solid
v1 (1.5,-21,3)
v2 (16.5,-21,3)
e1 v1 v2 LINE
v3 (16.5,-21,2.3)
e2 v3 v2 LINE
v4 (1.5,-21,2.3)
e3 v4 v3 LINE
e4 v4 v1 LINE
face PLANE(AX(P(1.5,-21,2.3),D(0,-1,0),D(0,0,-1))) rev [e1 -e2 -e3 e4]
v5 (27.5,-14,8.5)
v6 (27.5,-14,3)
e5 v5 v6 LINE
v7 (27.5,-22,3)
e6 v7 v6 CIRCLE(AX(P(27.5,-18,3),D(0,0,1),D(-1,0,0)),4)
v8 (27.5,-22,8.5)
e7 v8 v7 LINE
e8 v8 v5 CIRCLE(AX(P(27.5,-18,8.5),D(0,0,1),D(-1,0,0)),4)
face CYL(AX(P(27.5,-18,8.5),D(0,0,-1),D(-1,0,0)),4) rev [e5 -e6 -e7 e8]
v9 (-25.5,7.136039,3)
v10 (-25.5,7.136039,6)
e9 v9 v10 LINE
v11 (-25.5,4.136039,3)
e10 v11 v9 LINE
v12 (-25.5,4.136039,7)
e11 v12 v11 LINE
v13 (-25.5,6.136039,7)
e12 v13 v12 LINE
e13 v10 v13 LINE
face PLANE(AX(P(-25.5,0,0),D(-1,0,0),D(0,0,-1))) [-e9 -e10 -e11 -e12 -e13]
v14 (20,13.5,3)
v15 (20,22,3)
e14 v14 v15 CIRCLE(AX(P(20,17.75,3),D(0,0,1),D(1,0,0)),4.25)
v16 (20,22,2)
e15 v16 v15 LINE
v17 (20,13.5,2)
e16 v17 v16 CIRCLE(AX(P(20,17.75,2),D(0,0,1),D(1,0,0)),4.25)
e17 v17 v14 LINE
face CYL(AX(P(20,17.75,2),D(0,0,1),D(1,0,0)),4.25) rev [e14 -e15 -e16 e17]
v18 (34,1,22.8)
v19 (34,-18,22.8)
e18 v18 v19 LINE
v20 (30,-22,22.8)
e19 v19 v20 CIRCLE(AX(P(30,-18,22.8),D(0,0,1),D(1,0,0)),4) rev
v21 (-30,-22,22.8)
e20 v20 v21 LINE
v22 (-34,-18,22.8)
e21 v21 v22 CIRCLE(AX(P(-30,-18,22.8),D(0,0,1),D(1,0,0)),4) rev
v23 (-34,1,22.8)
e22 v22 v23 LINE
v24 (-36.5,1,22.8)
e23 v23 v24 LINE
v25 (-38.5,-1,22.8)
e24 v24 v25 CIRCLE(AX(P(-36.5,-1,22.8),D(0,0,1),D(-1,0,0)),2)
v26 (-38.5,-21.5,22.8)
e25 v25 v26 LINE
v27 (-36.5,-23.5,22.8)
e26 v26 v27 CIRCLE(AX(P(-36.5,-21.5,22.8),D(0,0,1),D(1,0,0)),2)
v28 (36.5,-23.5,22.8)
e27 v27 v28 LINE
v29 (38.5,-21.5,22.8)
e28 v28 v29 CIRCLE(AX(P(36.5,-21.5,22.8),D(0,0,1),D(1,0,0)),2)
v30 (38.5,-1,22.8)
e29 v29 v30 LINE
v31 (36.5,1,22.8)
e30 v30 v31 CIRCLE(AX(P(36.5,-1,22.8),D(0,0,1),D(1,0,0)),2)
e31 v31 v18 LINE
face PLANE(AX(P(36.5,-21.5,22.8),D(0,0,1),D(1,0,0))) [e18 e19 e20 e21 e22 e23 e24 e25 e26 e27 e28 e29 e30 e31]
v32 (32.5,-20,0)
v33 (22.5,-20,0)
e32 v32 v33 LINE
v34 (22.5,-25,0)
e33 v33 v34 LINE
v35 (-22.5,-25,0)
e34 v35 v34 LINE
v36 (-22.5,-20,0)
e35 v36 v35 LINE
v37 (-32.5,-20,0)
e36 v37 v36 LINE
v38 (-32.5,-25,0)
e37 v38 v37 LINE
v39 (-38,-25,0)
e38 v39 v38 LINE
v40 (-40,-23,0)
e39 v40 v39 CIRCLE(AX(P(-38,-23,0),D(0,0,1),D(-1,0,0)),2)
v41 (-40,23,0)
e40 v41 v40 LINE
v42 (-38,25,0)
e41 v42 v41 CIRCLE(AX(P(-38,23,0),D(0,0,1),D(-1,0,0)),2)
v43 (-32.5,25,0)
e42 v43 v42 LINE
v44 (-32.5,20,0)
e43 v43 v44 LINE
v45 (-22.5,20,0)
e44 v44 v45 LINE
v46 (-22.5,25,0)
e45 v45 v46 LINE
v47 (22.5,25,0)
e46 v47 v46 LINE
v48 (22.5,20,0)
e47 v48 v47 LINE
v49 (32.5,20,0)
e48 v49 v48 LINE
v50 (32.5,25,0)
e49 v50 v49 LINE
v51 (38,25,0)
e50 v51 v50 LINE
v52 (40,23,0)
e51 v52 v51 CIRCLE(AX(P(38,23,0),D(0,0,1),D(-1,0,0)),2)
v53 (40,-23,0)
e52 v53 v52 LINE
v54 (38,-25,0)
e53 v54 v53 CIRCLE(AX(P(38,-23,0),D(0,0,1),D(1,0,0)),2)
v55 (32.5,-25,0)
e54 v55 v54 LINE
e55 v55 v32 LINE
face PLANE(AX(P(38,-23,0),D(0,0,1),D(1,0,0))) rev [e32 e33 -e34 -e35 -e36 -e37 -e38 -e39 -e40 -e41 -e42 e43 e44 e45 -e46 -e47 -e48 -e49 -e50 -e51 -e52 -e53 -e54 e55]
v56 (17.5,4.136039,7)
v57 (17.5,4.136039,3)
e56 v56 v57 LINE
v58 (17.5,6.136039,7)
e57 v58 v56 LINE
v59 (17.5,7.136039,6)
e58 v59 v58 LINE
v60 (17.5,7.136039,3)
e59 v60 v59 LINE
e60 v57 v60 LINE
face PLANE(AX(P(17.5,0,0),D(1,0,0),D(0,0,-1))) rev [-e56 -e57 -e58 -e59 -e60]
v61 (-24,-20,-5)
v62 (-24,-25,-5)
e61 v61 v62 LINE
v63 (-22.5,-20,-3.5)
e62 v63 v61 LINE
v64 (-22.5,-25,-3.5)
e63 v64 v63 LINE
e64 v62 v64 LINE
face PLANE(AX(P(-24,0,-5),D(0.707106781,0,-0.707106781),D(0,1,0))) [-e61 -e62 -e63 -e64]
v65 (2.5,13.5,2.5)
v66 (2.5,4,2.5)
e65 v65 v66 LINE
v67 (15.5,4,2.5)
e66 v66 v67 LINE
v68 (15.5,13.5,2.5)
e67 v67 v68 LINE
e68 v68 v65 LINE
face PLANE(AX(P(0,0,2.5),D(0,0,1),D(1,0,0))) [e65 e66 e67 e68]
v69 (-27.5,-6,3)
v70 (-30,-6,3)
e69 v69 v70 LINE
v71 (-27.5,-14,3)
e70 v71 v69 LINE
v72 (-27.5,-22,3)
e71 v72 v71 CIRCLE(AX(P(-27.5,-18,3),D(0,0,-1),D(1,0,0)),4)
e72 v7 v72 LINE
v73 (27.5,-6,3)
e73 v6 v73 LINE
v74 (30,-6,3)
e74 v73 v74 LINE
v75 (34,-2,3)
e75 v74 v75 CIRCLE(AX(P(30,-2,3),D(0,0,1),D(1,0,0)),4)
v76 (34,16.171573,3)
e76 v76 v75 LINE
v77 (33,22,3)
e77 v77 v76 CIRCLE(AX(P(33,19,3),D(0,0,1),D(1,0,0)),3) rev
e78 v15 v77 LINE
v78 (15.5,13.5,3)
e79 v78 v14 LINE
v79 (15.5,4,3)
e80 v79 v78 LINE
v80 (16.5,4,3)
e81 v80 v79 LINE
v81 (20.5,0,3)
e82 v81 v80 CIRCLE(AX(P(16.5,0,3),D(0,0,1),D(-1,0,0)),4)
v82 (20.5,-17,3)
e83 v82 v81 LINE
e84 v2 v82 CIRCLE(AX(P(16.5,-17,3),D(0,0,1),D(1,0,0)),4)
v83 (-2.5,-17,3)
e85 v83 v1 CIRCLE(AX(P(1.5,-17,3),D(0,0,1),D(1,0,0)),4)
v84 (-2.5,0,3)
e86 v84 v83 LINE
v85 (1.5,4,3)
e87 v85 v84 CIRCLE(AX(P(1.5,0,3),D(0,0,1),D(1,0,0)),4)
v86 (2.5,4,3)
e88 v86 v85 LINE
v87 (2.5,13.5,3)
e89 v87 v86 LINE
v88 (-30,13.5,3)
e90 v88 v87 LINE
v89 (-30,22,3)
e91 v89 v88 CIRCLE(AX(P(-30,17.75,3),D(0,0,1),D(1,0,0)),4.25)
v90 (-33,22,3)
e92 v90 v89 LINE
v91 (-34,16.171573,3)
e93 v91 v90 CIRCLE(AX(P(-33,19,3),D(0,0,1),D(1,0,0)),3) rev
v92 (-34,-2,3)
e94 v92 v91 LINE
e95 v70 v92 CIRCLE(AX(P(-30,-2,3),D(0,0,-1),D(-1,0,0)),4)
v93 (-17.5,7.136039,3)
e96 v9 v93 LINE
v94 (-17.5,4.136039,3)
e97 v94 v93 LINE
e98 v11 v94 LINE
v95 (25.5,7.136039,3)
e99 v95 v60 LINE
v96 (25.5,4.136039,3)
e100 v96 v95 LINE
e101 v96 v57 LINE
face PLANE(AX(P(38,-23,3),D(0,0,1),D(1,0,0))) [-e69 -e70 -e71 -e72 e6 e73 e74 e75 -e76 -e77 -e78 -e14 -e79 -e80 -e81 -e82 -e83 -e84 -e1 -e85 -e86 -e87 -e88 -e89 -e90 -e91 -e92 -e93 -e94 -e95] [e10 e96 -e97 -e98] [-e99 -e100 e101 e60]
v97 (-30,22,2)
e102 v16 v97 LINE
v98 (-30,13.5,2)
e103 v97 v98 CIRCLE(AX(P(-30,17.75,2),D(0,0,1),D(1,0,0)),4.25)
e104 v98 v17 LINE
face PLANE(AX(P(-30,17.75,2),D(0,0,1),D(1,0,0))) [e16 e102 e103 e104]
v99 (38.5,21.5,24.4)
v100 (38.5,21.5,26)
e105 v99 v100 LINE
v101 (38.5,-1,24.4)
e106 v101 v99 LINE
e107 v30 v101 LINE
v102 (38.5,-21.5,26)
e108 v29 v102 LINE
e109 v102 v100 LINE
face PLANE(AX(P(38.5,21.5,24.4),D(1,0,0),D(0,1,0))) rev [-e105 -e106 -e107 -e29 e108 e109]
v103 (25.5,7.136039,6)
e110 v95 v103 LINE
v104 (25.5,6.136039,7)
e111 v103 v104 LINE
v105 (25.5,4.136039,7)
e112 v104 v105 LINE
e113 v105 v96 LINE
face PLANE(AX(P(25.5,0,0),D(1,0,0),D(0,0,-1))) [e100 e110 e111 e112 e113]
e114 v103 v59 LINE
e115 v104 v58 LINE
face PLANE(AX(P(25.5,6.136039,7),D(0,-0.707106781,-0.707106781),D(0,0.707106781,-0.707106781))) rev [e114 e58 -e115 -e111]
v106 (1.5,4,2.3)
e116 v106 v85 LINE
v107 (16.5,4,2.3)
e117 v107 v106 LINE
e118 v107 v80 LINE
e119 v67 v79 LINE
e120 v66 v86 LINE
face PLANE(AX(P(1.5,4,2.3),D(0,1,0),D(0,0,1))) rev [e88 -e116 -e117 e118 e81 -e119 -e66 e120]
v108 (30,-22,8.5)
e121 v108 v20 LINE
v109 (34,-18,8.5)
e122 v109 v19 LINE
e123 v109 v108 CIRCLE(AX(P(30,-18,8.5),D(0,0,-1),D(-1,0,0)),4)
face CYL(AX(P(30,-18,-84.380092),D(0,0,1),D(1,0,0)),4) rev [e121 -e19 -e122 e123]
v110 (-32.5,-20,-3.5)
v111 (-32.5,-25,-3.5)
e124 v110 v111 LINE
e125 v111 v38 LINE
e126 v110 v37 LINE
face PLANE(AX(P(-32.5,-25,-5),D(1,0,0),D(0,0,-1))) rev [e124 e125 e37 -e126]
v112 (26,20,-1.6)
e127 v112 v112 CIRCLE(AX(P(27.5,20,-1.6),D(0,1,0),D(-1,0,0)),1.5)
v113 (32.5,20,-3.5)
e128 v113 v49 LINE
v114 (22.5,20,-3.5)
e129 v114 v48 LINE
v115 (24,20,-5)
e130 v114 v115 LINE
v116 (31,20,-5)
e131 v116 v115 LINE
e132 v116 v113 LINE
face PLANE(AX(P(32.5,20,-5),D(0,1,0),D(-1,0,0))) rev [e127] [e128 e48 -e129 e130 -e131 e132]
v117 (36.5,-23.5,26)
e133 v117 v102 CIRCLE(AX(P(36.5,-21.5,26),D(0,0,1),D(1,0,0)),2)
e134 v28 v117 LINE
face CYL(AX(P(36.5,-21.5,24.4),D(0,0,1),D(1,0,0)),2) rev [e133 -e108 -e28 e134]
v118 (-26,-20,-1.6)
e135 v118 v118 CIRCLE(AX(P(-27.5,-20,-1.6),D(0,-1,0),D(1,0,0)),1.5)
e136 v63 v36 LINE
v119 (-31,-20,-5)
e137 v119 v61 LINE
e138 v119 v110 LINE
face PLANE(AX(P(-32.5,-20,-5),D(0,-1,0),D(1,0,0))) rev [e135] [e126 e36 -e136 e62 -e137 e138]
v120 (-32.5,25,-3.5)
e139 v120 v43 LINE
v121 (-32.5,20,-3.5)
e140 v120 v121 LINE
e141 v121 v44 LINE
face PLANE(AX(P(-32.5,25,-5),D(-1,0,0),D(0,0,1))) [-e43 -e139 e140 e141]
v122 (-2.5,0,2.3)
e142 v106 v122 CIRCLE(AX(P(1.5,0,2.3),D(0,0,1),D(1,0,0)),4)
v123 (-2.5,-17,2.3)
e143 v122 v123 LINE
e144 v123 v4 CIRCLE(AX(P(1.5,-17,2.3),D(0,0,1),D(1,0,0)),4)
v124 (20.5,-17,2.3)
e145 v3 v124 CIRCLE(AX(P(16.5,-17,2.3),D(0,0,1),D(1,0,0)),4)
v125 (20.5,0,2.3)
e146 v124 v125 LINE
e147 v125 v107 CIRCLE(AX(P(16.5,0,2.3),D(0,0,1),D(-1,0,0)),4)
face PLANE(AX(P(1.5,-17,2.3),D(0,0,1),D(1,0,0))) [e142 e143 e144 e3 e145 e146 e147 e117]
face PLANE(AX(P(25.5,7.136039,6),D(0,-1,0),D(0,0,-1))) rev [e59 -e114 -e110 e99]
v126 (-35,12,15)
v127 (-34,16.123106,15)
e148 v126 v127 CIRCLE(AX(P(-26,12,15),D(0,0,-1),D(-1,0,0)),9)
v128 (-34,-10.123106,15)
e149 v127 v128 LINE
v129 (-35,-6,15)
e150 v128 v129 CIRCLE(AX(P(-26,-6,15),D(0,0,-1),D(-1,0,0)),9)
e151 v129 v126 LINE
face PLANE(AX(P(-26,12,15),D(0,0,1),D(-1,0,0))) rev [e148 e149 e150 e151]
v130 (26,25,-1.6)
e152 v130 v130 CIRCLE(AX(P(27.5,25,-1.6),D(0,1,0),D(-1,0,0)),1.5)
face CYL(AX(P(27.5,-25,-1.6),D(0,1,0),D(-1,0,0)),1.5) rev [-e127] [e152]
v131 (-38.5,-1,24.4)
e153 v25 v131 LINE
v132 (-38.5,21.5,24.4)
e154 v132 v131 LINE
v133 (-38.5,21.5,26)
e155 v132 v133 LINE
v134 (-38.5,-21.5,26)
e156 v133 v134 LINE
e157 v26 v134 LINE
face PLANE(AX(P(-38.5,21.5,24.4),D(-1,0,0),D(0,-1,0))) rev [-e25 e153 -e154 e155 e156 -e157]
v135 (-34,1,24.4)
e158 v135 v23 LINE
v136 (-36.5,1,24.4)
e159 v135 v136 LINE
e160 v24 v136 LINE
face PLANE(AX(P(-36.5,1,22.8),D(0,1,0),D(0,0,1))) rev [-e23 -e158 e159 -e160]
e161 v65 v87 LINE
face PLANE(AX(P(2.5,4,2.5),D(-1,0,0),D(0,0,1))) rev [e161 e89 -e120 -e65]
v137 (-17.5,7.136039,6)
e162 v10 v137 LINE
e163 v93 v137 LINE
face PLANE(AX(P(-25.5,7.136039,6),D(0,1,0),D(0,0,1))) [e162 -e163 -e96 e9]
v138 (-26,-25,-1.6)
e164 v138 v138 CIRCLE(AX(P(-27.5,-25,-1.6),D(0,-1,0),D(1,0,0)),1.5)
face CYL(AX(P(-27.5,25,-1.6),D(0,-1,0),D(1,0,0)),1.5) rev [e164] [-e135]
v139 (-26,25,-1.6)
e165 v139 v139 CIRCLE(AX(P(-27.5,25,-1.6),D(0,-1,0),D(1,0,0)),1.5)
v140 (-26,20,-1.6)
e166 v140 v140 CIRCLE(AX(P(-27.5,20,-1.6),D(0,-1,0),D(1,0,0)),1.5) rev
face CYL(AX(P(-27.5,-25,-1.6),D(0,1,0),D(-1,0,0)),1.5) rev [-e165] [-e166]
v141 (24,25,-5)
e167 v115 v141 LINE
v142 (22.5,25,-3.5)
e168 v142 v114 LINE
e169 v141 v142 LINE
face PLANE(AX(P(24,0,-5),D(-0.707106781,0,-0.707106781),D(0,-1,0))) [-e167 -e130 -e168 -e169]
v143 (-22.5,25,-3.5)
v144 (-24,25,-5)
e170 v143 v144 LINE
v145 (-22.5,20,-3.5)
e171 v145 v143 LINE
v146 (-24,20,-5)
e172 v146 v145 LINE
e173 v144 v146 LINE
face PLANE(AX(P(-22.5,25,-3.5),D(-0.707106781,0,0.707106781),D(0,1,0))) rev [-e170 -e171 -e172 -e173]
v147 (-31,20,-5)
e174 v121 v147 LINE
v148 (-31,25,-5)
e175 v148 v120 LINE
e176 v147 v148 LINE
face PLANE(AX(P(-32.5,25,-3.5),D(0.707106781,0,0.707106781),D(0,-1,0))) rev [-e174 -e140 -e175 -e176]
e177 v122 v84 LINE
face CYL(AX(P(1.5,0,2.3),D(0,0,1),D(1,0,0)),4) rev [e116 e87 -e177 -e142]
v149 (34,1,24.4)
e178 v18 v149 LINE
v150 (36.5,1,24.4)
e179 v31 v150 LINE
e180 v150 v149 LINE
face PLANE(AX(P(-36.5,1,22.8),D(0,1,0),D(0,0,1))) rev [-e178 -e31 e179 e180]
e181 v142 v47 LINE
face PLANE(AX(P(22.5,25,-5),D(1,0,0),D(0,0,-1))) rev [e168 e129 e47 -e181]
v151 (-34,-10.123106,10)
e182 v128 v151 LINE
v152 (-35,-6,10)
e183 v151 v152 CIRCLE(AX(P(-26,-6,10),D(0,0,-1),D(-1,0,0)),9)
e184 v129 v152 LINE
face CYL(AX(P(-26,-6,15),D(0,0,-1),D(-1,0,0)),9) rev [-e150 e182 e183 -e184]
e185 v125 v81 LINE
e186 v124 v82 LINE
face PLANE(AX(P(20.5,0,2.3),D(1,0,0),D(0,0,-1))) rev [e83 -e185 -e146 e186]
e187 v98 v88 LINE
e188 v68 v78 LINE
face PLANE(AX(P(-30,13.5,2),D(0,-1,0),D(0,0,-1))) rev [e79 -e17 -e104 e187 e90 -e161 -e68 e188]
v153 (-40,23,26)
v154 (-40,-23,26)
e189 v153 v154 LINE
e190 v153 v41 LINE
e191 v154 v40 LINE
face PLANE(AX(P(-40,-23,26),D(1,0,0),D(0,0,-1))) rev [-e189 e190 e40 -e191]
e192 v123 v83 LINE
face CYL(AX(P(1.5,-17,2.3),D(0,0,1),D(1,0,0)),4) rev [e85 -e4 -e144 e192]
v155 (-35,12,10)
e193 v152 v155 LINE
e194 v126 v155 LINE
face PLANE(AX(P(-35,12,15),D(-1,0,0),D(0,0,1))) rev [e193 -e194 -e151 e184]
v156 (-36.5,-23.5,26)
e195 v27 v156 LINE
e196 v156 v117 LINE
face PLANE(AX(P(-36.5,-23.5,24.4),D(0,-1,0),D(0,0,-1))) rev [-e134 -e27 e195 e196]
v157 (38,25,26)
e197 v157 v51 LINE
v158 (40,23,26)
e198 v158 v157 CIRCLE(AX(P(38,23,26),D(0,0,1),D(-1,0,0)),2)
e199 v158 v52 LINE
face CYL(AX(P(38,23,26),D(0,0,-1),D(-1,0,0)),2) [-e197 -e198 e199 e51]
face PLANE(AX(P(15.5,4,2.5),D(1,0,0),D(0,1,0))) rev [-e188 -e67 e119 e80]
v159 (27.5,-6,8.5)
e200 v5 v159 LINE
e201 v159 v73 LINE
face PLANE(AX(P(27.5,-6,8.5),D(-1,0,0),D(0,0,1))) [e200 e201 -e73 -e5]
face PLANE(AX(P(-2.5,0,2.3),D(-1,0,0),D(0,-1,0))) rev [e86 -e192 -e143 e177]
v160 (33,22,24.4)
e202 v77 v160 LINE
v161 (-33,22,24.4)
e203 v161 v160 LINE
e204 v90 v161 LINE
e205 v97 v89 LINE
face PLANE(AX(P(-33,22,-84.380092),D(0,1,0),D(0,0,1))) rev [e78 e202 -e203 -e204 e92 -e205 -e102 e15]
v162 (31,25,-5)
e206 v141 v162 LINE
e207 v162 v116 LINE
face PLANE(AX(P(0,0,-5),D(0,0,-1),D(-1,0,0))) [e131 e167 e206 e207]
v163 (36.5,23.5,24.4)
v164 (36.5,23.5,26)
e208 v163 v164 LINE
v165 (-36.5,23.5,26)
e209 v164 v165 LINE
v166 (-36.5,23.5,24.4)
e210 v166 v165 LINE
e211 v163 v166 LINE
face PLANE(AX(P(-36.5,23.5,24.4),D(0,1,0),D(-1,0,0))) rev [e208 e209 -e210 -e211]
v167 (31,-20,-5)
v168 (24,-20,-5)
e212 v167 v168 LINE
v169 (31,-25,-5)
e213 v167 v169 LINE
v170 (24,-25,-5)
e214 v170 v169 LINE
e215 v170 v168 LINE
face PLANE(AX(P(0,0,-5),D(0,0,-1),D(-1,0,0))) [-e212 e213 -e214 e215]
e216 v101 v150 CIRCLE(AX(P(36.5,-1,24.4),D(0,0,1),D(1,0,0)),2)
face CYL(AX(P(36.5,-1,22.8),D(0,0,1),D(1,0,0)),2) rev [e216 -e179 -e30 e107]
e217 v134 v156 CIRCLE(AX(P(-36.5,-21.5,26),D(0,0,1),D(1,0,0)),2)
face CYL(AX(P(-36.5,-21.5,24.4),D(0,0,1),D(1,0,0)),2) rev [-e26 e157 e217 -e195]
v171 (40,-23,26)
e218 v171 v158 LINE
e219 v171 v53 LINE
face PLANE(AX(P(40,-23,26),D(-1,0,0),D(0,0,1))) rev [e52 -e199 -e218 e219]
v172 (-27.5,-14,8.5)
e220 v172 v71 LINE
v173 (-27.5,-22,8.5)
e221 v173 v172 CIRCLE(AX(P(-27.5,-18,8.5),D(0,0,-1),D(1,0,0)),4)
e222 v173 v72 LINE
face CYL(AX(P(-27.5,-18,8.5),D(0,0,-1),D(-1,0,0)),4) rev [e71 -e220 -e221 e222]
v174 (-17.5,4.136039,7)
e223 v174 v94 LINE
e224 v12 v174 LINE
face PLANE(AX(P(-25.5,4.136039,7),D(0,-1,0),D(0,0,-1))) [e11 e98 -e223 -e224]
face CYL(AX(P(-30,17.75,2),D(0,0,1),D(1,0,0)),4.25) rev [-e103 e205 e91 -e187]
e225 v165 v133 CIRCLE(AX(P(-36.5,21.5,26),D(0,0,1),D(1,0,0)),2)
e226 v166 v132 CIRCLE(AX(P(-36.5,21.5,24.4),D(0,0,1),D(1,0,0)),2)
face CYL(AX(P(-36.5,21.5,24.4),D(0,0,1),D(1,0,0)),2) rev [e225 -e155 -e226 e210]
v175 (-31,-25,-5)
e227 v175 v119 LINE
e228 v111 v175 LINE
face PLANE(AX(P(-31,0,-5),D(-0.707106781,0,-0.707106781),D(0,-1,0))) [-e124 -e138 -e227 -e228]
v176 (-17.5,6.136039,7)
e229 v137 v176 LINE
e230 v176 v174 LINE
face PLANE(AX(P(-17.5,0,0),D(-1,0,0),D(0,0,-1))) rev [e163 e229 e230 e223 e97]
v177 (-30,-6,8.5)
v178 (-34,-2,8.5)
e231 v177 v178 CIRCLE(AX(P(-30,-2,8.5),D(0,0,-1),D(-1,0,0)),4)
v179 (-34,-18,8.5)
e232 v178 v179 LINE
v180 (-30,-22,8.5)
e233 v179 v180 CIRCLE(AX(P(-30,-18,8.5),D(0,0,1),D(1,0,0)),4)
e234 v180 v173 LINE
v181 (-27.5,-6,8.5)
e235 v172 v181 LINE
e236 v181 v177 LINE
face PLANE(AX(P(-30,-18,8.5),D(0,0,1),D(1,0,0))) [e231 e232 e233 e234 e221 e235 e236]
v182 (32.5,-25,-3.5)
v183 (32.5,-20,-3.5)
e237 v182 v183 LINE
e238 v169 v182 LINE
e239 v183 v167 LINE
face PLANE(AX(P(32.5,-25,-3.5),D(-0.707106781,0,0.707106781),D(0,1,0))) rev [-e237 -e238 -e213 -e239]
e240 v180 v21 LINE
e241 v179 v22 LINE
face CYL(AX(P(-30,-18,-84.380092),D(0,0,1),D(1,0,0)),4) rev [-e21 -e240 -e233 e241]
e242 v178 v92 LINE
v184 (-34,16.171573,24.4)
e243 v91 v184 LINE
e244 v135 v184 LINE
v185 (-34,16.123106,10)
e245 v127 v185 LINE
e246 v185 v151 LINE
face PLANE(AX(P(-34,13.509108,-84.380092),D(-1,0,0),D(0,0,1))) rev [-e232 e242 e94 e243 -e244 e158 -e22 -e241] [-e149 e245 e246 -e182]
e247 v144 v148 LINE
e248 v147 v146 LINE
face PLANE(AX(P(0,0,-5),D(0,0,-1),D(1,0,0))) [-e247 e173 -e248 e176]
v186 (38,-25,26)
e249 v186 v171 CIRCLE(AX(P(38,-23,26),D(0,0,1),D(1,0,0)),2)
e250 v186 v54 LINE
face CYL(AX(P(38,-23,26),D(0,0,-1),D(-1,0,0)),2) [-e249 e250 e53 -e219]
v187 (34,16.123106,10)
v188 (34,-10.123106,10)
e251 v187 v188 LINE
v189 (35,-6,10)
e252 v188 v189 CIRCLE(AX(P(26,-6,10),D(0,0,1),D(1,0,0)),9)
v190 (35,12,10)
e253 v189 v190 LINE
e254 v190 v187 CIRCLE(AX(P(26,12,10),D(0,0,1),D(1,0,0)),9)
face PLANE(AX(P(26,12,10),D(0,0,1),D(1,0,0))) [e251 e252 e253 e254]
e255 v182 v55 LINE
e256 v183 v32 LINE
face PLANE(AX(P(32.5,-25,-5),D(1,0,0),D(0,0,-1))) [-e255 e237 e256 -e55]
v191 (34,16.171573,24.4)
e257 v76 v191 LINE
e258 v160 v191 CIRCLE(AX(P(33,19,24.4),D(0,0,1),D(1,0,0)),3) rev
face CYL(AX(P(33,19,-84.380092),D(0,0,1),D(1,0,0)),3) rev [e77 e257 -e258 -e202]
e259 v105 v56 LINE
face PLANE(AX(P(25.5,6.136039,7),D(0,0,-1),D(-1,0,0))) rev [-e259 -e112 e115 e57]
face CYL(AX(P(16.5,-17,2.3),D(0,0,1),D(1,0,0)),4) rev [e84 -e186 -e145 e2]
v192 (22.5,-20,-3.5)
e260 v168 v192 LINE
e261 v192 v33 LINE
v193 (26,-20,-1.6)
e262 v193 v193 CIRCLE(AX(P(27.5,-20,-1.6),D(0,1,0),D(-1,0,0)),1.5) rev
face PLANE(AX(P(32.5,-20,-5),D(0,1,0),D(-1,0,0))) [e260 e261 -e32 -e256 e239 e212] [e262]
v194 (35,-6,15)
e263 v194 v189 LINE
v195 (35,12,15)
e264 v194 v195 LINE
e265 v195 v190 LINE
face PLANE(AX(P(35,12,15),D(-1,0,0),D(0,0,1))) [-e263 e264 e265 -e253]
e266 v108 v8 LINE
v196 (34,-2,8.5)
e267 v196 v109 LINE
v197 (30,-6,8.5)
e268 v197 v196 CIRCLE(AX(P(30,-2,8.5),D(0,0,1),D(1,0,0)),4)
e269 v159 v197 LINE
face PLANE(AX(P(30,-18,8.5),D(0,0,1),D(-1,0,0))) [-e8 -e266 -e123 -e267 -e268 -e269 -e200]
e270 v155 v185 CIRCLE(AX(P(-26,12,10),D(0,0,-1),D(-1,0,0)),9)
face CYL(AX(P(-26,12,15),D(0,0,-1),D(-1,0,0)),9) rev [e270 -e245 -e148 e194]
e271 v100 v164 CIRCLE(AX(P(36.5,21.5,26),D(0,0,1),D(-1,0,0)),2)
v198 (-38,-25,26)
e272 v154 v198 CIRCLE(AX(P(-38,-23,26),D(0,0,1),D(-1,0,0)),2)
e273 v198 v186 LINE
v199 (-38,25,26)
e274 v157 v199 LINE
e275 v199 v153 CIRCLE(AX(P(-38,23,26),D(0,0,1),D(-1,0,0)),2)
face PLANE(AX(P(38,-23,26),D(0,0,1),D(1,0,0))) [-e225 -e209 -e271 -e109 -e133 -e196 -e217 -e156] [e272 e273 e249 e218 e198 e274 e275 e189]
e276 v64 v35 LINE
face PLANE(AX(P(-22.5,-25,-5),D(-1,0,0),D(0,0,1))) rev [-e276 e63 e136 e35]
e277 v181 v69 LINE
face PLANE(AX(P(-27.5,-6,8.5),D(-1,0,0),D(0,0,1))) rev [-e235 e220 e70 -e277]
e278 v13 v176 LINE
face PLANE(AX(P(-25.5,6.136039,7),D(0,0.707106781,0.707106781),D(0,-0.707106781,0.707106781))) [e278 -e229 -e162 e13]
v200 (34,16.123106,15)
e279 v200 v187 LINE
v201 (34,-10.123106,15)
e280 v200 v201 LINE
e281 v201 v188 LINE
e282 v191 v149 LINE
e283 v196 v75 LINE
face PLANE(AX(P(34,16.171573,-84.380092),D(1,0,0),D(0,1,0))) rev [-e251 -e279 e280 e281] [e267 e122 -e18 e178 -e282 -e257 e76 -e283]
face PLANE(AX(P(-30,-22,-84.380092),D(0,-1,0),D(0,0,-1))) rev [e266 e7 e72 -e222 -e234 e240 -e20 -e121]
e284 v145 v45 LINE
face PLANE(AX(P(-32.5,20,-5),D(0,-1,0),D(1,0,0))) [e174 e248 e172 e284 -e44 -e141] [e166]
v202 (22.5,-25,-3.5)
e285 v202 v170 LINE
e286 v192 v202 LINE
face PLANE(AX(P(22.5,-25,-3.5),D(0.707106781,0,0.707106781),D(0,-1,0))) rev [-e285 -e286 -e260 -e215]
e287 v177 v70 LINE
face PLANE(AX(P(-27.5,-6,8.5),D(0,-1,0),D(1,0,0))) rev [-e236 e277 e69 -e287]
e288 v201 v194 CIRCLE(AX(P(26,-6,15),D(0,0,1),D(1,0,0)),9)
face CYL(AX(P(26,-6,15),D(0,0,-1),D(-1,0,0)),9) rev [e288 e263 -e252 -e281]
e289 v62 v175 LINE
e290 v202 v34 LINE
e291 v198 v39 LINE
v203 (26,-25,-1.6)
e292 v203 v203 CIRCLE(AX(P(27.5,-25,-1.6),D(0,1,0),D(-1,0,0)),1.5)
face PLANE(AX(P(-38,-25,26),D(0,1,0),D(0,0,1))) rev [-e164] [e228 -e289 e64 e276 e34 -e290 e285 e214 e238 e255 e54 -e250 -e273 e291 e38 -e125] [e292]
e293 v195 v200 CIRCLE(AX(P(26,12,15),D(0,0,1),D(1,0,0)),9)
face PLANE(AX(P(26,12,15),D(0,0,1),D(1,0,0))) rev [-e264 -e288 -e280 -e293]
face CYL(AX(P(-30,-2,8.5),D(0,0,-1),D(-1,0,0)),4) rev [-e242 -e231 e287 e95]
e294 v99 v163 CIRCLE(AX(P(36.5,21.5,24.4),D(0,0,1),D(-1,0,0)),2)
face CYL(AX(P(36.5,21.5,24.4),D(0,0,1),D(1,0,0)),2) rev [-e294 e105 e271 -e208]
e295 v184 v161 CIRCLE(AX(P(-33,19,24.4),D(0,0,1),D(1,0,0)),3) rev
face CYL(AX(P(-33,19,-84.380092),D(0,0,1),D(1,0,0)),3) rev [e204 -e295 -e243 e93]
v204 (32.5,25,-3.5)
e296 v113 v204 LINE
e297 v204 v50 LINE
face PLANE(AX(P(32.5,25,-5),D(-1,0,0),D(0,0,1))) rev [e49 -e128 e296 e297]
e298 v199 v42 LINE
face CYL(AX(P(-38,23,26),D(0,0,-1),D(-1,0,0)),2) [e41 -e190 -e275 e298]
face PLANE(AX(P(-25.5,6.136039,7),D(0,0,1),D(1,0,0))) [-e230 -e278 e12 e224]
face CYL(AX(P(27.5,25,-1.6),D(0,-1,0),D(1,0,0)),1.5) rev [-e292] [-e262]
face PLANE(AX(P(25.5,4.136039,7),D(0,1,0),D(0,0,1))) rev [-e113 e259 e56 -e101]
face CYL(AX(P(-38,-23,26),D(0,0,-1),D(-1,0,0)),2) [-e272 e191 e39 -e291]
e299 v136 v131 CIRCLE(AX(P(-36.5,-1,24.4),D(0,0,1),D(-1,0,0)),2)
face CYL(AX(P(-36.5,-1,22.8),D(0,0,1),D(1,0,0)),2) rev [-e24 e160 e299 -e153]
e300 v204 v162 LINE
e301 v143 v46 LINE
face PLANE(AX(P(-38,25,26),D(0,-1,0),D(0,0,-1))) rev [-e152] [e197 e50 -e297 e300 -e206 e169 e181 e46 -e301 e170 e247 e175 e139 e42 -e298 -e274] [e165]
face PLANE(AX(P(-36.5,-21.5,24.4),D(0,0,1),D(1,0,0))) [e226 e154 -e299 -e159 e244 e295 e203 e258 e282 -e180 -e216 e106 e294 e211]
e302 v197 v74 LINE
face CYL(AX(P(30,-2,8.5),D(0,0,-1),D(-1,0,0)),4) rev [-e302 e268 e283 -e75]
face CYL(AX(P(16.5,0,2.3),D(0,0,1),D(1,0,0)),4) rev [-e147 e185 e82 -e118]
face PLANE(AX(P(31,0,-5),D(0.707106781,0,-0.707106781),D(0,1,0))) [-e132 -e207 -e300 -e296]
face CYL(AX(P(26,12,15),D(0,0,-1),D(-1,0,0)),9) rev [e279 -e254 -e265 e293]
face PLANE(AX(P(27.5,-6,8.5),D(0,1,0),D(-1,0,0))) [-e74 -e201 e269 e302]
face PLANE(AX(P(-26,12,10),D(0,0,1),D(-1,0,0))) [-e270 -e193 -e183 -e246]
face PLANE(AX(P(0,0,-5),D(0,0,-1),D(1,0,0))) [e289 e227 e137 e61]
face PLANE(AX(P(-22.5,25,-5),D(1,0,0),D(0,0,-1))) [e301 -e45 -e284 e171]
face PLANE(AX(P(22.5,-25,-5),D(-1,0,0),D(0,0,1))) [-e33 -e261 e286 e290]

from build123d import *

# Parameters (mm, degrees)
EXTRUDE_1_DEPTH            = 26
CUT_EXTRUDE_1_DEPTH        = 23
CUT_EXTRUDE_2_DEPTH        = 1.6
EXTRUDE_START              = 5.5
EXTRUDE_2_DEPTH            = 5.5
EXTRUDE_START_2            = 17.5
EXTRUDE_3_DEPTH            = 8
CUT_EXTRUDE_3_DEPTH        = 1.6
SKETCH_10_W                = 10
SKETCH_10_H                = 5
EXTRUDE_4_DEPTH            = 5
SKETCH_11_R                = 1.5
CUT_EXTRUDE_4_DEPTH        = 70.108610173
CHAMFER_1_SIZE             = 1.5
CHAMFER_1_OF_MIRROR_2_SIZE = 1.5
MIRROR_START               = -25
MIRROR_3_OUTLINE_R         = 1.5
MIRROR_3_DEPTH             = 5
CUT_EXTRUDE1_START         = 1.5
CUT_EXTRUDE1_DEPTH         = 5
CUT_EXTRUDE_5_DEPTH        = 0.7
CUT_EXTRUDE_6_DEPTH        = 1
SKETCH_16_W                = 13
SKETCH_16_H                = 9.5
CUT_EXTRUDE_10_DEPTH       = 0.5


# Read off the part's stored shape, not the designer's step: Зеркальное отражение3
with BuildPart() as part:
    # Эскиз1 → Бобышка-Вытянуть1 (new body)
    with BuildSketch(Plane.XY):
        with BuildLine():
            Line((-38, -25), (38, -25))
            ThreePointArc((38, -25), (39.414213562, -24.414213562), (40, -23))
            Line((40, -23), (40, 23))
            ThreePointArc((40, 23), (39.414213562, 24.414213562), (38, 25))
            Line((38, 25), (-38, 25))
            ThreePointArc((-38, 25), (-39.414213562, 24.414213562), (-40, 23))
            Line((-40, 23), (-40, -23))
            ThreePointArc((-40, -23), (-39.414213562, -24.414213562), (-38, -25))
        make_face()
    extrude(amount=EXTRUDE_1_DEPTH)

    # Эскиз4 → Вырез-Вытянуть1 (cut)
    with BuildSketch(Plane.XY.offset(26)):
        with BuildLine():
            Line((-33, 22), (33, 22))
            ThreePointArc((33, 22), (35.956795679, 19.507305936), (34, 16.171572875))
            Line((34, 16.171572875), (34, 13.509108241))
            Line((34, 13.509108241), (34, -18))
            ThreePointArc((34, -18), (32.828427125, -20.828427125), (30, -22))
            Line((30, -22), (-30, -22))
            ThreePointArc((-30, -22), (-32.828427125, -20.828427125), (-34, -18))
            Line((-34, -18), (-34, 13.509108241))
            Line((-34, 13.509108241), (-34, 16.171572875))
            ThreePointArc((-34, 16.171572875), (-35.956795679, 19.507305936), (-33, 22))
        make_face()
    extrude(amount=-CUT_EXTRUDE_1_DEPTH, mode=Mode.SUBTRACT)

    # Эскиз6 → Вырез-Вытянуть2 (cut)
    with BuildSketch(Plane.XY.offset(26)):
        with BuildLine():
            Line((-36.5, 23.5), (36.5, 23.5))
            ThreePointArc((36.5, 23.5), (37.914213562, 22.914213562), (38.5, 21.5))
            Line((38.5, 21.5), (38.5, -21.5))
            ThreePointArc((38.5, -21.5), (37.914213562, -22.914213562), (36.5, -23.5))
            Line((36.5, -23.5), (-36.5, -23.5))
            ThreePointArc((-36.5, -23.5), (-37.914213562, -22.914213562), (-38.5, -21.5))
            Line((-38.5, -21.5), (-38.5, 21.5))
            ThreePointArc((-38.5, 21.5), (-37.914213562, 22.914213562), (-36.5, 23.5))
        make_face()
    extrude(amount=-CUT_EXTRUDE_2_DEPTH, mode=Mode.SUBTRACT)

    # Эскиз7 → Бобышка-Вытянуть2 (add)
    with BuildSketch(Plane.XY.offset(3).offset(EXTRUDE_START)):
        with BuildLine():
            Line((-27.5, -6), (-30, -6))
            ThreePointArc((-30, -6), (-32.828427125, -4.828427125), (-34, -2))
            Line((-34, -2), (-34, -18))
            ThreePointArc((-34, -18), (-32.828427125, -20.828427125), (-30, -22))
            Line((-30, -22), (-27.5, -22))
            ThreePointArc((-27.5, -22), (-31.5, -18), (-27.5, -14))
            Line((-27.5, -14), (-27.5, -6))
        make_face()
    extrude_2 = extrude(amount=-EXTRUDE_2_DEPTH)

    # Зеркальное отражение4: Бобышка-Вытянуть2 across plane
    add(extrude_2.mirror(Plane(origin=(0, 0, 0), x_dir=(0, 0, 1), z_dir=(1, 0, 0))))

    # Эскиз8 → Бобышка-Вытянуть3 (add)
    with BuildSketch(Plane(origin=(0, 0, 0), x_dir=(0, 0, -1), z_dir=(1, 0, 0)).offset(EXTRUDE_START_2)):
        Polygon((-6, 7.136038969), (-3, 7.136038969), (-3, 4.136038969), (-7, 4.136038969), (-7, 6.136038969), align=None)
    extrude_3 = extrude(amount=EXTRUDE_3_DEPTH)

    # Зеркальное отражение1: Бобышка-Вытянуть3 across plane
    add(extrude_3.mirror(Plane(origin=(0, 0, 0), x_dir=(0, 0, 1), z_dir=(1, 0, 0))))

    # Эскиз9 → Вырез-Вытянуть3 (cut)
    with BuildSketch(Plane.XY.offset(24.4)):
        with BuildLine():
            Line((-36.5, -23.5), (36.5, -23.5))
            ThreePointArc((36.5, -23.5), (37.914213562, -22.914213562), (38.5, -21.5))
            Line((38.5, -21.5), (38.5, -1))
            ThreePointArc((38.5, -1), (37.914213562, 0.414213562), (36.5, 1))
            Line((36.5, 1), (-36.5, 1))
            ThreePointArc((-36.5, 1), (-37.914213562, 0.414213562), (-38.5, -1))
            Line((-38.5, -1), (-38.5, -21.5))
            ThreePointArc((-38.5, -21.5), (-37.914213562, -22.914213562), (-36.5, -23.5))
        make_face()
    extrude(amount=-CUT_EXTRUDE_3_DEPTH, mode=Mode.SUBTRACT)

    # Эскиз10 → Бобышка-Вытянуть4 (add)
    with BuildSketch(Plane(origin=(0, 0, 0), x_dir=(-1, 0, 0), z_dir=(0, 0, -1))):
        with Locations((-27.5, 22.5)):
            Rectangle(SKETCH_10_W, SKETCH_10_H)
    extrude_4 = extrude(amount=EXTRUDE_4_DEPTH)

    # Эскиз11 → Вырез-Вытянуть4 (cut, through all)
    with BuildSketch(Plane(origin=(0, 25, 0), x_dir=(1, 0, 0), z_dir=(0, 1, 0))):
        with Locations(Location((27.5, 1.6, 0), (0, 0, 180))):
            Circle(SKETCH_11_R)
    cut_extrude_4 = extrude(amount=-CUT_EXTRUDE_4_DEPTH, mode=Mode.SUBTRACT)

    # Фаска1
    chamfer_1_edges = [part.edges().sort_by_distance(p)[0] for p in [
        (32.5, 22.5, -5),
        (22.5, 22.5, -5),
    ]]
    chamfer(chamfer_1_edges, length=CHAMFER_1_SIZE)

    # Зеркальное отражение2: Бобышка-Вытянуть4, Вырез-Вытянуть4 across plane
    add(extrude_4.mirror(Plane(origin=(0, 0, 0), x_dir=(0, 0, 1), z_dir=(1, 0, 0))))
    add(cut_extrude_4.mirror(Plane(origin=(0, 0, 0), x_dir=(0, 0, 1), z_dir=(1, 0, 0))), mode=Mode.SUBTRACT)

    # Фаска1 of Зеркальное отражение2
    chamfer_1_of_mirror_2_edges = [part.edges().sort_by_distance(p)[0] for p in [
        (-32.5, 22.5, -5),
        (-22.5, 22.5, -5),
    ]]
    chamfer(chamfer_1_of_mirror_2_edges, length=CHAMFER_1_OF_MIRROR_2_SIZE)

    # Зеркальное отражение3 outline → Зеркальное отражение3 (add)
    # profile 1 of 2: a face of its own
    with BuildSketch(Plane(origin=(0, 0, 0), x_dir=(1, 0, 0), z_dir=(0, 1, 0)).offset(MIRROR_START)):
        Polygon((22.5, 0), (32.5, 0), (32.5, 3.5), (31, 5), (24, 5), (22.5, 3.5), align=None)
        with Locations((27.5, 1.6)):
            Circle(MIRROR_3_OUTLINE_R, mode=Mode.SUBTRACT)
    # profile 2 of 2: a face of its own
    with BuildSketch(Plane(origin=(0, 0, 0), x_dir=(1, 0, 0), z_dir=(0, 1, 0)).offset(MIRROR_START)):
        Polygon((-32.5, 0), (-22.5, 0), (-22.5, 3.5), (-24, 5), (-31, 5), (-32.5, 3.5), align=None)
        with Locations((-27.5, 1.6)):
            Circle(MIRROR_3_OUTLINE_R, mode=Mode.SUBTRACT)
    extrude(amount=MIRROR_3_DEPTH)

    # Sketch1 → Cut-Extrude1 (cut)
    with BuildSketch(Plane.XY.offset(8.5).offset(CUT_EXTRUDE1_START)):
        with BuildLine():
            Line((35, 12), (35, -6))
            ThreePointArc((35, -6), (34.746427842, -8.121320344), (34, -10.123105626))
            Line((34, -10.123105626), (34, 16.123105626))
            ThreePointArc((34, 16.123105626), (34.746427842, 14.121320344), (35, 12))
        make_face()
    cut_extrude1 = extrude(amount=CUT_EXTRUDE1_DEPTH, mode=Mode.SUBTRACT)

    # Mirror1: Cut-Extrude1 across plane
    add(cut_extrude1.mirror(Plane(origin=(0, 0, 0), x_dir=(0, 0, 1), z_dir=(1, 0, 0))), mode=Mode.SUBTRACT)

    # Эскиз13 → Вырез-Вытянуть5 (cut)
    with BuildSketch(Plane.XY.offset(3)):
        with BuildLine():
            Line((15.5, 4), (16.5, 4))
            ThreePointArc((16.5, 4), (19.328427125, 2.828427125), (20.5, 0))
            Line((20.5, 0), (20.5, -17))
            ThreePointArc((20.5, -17), (19.328427125, -19.828427125), (16.5, -21))
            Line((16.5, -21), (1.5, -21))
            ThreePointArc((1.5, -21), (-1.328427125, -19.828427125), (-2.5, -17))
            Line((-2.5, -17), (-2.5, 0))
            ThreePointArc((-2.5, 0), (-1.328427125, 2.828427125), (1.5, 4))
            Line((1.5, 4), (2.5, 4))
            Line((2.5, 4), (15.5, 4))
        make_face()
    extrude(amount=-CUT_EXTRUDE_5_DEPTH, mode=Mode.SUBTRACT)

    # Эскиз14 → Вырез-Вытянуть6 (cut)
    with BuildSketch(Plane.XY.offset(3)):
        with BuildLine():
            Line((-30, 22), (20, 22))
            ThreePointArc((20, 22), (24.25, 17.75), (20, 13.5))
            Line((20, 13.5), (-30, 13.5))
            ThreePointArc((-30, 13.5), (-34.25, 17.75), (-30, 22))
        make_face()
    extrude(amount=-CUT_EXTRUDE_6_DEPTH, mode=Mode.SUBTRACT)

    # Эскиз16 → Вырез-Вытянуть10 (cut)
    with BuildSketch(Plane.XY.offset(3)):
        with Locations((9, 8.75)):
            Rectangle(SKETCH_16_W, SKETCH_16_H)
    extrude(amount=-CUT_EXTRUDE_10_DEPTH, mode=Mode.SUBTRACT)


solid = part.part
